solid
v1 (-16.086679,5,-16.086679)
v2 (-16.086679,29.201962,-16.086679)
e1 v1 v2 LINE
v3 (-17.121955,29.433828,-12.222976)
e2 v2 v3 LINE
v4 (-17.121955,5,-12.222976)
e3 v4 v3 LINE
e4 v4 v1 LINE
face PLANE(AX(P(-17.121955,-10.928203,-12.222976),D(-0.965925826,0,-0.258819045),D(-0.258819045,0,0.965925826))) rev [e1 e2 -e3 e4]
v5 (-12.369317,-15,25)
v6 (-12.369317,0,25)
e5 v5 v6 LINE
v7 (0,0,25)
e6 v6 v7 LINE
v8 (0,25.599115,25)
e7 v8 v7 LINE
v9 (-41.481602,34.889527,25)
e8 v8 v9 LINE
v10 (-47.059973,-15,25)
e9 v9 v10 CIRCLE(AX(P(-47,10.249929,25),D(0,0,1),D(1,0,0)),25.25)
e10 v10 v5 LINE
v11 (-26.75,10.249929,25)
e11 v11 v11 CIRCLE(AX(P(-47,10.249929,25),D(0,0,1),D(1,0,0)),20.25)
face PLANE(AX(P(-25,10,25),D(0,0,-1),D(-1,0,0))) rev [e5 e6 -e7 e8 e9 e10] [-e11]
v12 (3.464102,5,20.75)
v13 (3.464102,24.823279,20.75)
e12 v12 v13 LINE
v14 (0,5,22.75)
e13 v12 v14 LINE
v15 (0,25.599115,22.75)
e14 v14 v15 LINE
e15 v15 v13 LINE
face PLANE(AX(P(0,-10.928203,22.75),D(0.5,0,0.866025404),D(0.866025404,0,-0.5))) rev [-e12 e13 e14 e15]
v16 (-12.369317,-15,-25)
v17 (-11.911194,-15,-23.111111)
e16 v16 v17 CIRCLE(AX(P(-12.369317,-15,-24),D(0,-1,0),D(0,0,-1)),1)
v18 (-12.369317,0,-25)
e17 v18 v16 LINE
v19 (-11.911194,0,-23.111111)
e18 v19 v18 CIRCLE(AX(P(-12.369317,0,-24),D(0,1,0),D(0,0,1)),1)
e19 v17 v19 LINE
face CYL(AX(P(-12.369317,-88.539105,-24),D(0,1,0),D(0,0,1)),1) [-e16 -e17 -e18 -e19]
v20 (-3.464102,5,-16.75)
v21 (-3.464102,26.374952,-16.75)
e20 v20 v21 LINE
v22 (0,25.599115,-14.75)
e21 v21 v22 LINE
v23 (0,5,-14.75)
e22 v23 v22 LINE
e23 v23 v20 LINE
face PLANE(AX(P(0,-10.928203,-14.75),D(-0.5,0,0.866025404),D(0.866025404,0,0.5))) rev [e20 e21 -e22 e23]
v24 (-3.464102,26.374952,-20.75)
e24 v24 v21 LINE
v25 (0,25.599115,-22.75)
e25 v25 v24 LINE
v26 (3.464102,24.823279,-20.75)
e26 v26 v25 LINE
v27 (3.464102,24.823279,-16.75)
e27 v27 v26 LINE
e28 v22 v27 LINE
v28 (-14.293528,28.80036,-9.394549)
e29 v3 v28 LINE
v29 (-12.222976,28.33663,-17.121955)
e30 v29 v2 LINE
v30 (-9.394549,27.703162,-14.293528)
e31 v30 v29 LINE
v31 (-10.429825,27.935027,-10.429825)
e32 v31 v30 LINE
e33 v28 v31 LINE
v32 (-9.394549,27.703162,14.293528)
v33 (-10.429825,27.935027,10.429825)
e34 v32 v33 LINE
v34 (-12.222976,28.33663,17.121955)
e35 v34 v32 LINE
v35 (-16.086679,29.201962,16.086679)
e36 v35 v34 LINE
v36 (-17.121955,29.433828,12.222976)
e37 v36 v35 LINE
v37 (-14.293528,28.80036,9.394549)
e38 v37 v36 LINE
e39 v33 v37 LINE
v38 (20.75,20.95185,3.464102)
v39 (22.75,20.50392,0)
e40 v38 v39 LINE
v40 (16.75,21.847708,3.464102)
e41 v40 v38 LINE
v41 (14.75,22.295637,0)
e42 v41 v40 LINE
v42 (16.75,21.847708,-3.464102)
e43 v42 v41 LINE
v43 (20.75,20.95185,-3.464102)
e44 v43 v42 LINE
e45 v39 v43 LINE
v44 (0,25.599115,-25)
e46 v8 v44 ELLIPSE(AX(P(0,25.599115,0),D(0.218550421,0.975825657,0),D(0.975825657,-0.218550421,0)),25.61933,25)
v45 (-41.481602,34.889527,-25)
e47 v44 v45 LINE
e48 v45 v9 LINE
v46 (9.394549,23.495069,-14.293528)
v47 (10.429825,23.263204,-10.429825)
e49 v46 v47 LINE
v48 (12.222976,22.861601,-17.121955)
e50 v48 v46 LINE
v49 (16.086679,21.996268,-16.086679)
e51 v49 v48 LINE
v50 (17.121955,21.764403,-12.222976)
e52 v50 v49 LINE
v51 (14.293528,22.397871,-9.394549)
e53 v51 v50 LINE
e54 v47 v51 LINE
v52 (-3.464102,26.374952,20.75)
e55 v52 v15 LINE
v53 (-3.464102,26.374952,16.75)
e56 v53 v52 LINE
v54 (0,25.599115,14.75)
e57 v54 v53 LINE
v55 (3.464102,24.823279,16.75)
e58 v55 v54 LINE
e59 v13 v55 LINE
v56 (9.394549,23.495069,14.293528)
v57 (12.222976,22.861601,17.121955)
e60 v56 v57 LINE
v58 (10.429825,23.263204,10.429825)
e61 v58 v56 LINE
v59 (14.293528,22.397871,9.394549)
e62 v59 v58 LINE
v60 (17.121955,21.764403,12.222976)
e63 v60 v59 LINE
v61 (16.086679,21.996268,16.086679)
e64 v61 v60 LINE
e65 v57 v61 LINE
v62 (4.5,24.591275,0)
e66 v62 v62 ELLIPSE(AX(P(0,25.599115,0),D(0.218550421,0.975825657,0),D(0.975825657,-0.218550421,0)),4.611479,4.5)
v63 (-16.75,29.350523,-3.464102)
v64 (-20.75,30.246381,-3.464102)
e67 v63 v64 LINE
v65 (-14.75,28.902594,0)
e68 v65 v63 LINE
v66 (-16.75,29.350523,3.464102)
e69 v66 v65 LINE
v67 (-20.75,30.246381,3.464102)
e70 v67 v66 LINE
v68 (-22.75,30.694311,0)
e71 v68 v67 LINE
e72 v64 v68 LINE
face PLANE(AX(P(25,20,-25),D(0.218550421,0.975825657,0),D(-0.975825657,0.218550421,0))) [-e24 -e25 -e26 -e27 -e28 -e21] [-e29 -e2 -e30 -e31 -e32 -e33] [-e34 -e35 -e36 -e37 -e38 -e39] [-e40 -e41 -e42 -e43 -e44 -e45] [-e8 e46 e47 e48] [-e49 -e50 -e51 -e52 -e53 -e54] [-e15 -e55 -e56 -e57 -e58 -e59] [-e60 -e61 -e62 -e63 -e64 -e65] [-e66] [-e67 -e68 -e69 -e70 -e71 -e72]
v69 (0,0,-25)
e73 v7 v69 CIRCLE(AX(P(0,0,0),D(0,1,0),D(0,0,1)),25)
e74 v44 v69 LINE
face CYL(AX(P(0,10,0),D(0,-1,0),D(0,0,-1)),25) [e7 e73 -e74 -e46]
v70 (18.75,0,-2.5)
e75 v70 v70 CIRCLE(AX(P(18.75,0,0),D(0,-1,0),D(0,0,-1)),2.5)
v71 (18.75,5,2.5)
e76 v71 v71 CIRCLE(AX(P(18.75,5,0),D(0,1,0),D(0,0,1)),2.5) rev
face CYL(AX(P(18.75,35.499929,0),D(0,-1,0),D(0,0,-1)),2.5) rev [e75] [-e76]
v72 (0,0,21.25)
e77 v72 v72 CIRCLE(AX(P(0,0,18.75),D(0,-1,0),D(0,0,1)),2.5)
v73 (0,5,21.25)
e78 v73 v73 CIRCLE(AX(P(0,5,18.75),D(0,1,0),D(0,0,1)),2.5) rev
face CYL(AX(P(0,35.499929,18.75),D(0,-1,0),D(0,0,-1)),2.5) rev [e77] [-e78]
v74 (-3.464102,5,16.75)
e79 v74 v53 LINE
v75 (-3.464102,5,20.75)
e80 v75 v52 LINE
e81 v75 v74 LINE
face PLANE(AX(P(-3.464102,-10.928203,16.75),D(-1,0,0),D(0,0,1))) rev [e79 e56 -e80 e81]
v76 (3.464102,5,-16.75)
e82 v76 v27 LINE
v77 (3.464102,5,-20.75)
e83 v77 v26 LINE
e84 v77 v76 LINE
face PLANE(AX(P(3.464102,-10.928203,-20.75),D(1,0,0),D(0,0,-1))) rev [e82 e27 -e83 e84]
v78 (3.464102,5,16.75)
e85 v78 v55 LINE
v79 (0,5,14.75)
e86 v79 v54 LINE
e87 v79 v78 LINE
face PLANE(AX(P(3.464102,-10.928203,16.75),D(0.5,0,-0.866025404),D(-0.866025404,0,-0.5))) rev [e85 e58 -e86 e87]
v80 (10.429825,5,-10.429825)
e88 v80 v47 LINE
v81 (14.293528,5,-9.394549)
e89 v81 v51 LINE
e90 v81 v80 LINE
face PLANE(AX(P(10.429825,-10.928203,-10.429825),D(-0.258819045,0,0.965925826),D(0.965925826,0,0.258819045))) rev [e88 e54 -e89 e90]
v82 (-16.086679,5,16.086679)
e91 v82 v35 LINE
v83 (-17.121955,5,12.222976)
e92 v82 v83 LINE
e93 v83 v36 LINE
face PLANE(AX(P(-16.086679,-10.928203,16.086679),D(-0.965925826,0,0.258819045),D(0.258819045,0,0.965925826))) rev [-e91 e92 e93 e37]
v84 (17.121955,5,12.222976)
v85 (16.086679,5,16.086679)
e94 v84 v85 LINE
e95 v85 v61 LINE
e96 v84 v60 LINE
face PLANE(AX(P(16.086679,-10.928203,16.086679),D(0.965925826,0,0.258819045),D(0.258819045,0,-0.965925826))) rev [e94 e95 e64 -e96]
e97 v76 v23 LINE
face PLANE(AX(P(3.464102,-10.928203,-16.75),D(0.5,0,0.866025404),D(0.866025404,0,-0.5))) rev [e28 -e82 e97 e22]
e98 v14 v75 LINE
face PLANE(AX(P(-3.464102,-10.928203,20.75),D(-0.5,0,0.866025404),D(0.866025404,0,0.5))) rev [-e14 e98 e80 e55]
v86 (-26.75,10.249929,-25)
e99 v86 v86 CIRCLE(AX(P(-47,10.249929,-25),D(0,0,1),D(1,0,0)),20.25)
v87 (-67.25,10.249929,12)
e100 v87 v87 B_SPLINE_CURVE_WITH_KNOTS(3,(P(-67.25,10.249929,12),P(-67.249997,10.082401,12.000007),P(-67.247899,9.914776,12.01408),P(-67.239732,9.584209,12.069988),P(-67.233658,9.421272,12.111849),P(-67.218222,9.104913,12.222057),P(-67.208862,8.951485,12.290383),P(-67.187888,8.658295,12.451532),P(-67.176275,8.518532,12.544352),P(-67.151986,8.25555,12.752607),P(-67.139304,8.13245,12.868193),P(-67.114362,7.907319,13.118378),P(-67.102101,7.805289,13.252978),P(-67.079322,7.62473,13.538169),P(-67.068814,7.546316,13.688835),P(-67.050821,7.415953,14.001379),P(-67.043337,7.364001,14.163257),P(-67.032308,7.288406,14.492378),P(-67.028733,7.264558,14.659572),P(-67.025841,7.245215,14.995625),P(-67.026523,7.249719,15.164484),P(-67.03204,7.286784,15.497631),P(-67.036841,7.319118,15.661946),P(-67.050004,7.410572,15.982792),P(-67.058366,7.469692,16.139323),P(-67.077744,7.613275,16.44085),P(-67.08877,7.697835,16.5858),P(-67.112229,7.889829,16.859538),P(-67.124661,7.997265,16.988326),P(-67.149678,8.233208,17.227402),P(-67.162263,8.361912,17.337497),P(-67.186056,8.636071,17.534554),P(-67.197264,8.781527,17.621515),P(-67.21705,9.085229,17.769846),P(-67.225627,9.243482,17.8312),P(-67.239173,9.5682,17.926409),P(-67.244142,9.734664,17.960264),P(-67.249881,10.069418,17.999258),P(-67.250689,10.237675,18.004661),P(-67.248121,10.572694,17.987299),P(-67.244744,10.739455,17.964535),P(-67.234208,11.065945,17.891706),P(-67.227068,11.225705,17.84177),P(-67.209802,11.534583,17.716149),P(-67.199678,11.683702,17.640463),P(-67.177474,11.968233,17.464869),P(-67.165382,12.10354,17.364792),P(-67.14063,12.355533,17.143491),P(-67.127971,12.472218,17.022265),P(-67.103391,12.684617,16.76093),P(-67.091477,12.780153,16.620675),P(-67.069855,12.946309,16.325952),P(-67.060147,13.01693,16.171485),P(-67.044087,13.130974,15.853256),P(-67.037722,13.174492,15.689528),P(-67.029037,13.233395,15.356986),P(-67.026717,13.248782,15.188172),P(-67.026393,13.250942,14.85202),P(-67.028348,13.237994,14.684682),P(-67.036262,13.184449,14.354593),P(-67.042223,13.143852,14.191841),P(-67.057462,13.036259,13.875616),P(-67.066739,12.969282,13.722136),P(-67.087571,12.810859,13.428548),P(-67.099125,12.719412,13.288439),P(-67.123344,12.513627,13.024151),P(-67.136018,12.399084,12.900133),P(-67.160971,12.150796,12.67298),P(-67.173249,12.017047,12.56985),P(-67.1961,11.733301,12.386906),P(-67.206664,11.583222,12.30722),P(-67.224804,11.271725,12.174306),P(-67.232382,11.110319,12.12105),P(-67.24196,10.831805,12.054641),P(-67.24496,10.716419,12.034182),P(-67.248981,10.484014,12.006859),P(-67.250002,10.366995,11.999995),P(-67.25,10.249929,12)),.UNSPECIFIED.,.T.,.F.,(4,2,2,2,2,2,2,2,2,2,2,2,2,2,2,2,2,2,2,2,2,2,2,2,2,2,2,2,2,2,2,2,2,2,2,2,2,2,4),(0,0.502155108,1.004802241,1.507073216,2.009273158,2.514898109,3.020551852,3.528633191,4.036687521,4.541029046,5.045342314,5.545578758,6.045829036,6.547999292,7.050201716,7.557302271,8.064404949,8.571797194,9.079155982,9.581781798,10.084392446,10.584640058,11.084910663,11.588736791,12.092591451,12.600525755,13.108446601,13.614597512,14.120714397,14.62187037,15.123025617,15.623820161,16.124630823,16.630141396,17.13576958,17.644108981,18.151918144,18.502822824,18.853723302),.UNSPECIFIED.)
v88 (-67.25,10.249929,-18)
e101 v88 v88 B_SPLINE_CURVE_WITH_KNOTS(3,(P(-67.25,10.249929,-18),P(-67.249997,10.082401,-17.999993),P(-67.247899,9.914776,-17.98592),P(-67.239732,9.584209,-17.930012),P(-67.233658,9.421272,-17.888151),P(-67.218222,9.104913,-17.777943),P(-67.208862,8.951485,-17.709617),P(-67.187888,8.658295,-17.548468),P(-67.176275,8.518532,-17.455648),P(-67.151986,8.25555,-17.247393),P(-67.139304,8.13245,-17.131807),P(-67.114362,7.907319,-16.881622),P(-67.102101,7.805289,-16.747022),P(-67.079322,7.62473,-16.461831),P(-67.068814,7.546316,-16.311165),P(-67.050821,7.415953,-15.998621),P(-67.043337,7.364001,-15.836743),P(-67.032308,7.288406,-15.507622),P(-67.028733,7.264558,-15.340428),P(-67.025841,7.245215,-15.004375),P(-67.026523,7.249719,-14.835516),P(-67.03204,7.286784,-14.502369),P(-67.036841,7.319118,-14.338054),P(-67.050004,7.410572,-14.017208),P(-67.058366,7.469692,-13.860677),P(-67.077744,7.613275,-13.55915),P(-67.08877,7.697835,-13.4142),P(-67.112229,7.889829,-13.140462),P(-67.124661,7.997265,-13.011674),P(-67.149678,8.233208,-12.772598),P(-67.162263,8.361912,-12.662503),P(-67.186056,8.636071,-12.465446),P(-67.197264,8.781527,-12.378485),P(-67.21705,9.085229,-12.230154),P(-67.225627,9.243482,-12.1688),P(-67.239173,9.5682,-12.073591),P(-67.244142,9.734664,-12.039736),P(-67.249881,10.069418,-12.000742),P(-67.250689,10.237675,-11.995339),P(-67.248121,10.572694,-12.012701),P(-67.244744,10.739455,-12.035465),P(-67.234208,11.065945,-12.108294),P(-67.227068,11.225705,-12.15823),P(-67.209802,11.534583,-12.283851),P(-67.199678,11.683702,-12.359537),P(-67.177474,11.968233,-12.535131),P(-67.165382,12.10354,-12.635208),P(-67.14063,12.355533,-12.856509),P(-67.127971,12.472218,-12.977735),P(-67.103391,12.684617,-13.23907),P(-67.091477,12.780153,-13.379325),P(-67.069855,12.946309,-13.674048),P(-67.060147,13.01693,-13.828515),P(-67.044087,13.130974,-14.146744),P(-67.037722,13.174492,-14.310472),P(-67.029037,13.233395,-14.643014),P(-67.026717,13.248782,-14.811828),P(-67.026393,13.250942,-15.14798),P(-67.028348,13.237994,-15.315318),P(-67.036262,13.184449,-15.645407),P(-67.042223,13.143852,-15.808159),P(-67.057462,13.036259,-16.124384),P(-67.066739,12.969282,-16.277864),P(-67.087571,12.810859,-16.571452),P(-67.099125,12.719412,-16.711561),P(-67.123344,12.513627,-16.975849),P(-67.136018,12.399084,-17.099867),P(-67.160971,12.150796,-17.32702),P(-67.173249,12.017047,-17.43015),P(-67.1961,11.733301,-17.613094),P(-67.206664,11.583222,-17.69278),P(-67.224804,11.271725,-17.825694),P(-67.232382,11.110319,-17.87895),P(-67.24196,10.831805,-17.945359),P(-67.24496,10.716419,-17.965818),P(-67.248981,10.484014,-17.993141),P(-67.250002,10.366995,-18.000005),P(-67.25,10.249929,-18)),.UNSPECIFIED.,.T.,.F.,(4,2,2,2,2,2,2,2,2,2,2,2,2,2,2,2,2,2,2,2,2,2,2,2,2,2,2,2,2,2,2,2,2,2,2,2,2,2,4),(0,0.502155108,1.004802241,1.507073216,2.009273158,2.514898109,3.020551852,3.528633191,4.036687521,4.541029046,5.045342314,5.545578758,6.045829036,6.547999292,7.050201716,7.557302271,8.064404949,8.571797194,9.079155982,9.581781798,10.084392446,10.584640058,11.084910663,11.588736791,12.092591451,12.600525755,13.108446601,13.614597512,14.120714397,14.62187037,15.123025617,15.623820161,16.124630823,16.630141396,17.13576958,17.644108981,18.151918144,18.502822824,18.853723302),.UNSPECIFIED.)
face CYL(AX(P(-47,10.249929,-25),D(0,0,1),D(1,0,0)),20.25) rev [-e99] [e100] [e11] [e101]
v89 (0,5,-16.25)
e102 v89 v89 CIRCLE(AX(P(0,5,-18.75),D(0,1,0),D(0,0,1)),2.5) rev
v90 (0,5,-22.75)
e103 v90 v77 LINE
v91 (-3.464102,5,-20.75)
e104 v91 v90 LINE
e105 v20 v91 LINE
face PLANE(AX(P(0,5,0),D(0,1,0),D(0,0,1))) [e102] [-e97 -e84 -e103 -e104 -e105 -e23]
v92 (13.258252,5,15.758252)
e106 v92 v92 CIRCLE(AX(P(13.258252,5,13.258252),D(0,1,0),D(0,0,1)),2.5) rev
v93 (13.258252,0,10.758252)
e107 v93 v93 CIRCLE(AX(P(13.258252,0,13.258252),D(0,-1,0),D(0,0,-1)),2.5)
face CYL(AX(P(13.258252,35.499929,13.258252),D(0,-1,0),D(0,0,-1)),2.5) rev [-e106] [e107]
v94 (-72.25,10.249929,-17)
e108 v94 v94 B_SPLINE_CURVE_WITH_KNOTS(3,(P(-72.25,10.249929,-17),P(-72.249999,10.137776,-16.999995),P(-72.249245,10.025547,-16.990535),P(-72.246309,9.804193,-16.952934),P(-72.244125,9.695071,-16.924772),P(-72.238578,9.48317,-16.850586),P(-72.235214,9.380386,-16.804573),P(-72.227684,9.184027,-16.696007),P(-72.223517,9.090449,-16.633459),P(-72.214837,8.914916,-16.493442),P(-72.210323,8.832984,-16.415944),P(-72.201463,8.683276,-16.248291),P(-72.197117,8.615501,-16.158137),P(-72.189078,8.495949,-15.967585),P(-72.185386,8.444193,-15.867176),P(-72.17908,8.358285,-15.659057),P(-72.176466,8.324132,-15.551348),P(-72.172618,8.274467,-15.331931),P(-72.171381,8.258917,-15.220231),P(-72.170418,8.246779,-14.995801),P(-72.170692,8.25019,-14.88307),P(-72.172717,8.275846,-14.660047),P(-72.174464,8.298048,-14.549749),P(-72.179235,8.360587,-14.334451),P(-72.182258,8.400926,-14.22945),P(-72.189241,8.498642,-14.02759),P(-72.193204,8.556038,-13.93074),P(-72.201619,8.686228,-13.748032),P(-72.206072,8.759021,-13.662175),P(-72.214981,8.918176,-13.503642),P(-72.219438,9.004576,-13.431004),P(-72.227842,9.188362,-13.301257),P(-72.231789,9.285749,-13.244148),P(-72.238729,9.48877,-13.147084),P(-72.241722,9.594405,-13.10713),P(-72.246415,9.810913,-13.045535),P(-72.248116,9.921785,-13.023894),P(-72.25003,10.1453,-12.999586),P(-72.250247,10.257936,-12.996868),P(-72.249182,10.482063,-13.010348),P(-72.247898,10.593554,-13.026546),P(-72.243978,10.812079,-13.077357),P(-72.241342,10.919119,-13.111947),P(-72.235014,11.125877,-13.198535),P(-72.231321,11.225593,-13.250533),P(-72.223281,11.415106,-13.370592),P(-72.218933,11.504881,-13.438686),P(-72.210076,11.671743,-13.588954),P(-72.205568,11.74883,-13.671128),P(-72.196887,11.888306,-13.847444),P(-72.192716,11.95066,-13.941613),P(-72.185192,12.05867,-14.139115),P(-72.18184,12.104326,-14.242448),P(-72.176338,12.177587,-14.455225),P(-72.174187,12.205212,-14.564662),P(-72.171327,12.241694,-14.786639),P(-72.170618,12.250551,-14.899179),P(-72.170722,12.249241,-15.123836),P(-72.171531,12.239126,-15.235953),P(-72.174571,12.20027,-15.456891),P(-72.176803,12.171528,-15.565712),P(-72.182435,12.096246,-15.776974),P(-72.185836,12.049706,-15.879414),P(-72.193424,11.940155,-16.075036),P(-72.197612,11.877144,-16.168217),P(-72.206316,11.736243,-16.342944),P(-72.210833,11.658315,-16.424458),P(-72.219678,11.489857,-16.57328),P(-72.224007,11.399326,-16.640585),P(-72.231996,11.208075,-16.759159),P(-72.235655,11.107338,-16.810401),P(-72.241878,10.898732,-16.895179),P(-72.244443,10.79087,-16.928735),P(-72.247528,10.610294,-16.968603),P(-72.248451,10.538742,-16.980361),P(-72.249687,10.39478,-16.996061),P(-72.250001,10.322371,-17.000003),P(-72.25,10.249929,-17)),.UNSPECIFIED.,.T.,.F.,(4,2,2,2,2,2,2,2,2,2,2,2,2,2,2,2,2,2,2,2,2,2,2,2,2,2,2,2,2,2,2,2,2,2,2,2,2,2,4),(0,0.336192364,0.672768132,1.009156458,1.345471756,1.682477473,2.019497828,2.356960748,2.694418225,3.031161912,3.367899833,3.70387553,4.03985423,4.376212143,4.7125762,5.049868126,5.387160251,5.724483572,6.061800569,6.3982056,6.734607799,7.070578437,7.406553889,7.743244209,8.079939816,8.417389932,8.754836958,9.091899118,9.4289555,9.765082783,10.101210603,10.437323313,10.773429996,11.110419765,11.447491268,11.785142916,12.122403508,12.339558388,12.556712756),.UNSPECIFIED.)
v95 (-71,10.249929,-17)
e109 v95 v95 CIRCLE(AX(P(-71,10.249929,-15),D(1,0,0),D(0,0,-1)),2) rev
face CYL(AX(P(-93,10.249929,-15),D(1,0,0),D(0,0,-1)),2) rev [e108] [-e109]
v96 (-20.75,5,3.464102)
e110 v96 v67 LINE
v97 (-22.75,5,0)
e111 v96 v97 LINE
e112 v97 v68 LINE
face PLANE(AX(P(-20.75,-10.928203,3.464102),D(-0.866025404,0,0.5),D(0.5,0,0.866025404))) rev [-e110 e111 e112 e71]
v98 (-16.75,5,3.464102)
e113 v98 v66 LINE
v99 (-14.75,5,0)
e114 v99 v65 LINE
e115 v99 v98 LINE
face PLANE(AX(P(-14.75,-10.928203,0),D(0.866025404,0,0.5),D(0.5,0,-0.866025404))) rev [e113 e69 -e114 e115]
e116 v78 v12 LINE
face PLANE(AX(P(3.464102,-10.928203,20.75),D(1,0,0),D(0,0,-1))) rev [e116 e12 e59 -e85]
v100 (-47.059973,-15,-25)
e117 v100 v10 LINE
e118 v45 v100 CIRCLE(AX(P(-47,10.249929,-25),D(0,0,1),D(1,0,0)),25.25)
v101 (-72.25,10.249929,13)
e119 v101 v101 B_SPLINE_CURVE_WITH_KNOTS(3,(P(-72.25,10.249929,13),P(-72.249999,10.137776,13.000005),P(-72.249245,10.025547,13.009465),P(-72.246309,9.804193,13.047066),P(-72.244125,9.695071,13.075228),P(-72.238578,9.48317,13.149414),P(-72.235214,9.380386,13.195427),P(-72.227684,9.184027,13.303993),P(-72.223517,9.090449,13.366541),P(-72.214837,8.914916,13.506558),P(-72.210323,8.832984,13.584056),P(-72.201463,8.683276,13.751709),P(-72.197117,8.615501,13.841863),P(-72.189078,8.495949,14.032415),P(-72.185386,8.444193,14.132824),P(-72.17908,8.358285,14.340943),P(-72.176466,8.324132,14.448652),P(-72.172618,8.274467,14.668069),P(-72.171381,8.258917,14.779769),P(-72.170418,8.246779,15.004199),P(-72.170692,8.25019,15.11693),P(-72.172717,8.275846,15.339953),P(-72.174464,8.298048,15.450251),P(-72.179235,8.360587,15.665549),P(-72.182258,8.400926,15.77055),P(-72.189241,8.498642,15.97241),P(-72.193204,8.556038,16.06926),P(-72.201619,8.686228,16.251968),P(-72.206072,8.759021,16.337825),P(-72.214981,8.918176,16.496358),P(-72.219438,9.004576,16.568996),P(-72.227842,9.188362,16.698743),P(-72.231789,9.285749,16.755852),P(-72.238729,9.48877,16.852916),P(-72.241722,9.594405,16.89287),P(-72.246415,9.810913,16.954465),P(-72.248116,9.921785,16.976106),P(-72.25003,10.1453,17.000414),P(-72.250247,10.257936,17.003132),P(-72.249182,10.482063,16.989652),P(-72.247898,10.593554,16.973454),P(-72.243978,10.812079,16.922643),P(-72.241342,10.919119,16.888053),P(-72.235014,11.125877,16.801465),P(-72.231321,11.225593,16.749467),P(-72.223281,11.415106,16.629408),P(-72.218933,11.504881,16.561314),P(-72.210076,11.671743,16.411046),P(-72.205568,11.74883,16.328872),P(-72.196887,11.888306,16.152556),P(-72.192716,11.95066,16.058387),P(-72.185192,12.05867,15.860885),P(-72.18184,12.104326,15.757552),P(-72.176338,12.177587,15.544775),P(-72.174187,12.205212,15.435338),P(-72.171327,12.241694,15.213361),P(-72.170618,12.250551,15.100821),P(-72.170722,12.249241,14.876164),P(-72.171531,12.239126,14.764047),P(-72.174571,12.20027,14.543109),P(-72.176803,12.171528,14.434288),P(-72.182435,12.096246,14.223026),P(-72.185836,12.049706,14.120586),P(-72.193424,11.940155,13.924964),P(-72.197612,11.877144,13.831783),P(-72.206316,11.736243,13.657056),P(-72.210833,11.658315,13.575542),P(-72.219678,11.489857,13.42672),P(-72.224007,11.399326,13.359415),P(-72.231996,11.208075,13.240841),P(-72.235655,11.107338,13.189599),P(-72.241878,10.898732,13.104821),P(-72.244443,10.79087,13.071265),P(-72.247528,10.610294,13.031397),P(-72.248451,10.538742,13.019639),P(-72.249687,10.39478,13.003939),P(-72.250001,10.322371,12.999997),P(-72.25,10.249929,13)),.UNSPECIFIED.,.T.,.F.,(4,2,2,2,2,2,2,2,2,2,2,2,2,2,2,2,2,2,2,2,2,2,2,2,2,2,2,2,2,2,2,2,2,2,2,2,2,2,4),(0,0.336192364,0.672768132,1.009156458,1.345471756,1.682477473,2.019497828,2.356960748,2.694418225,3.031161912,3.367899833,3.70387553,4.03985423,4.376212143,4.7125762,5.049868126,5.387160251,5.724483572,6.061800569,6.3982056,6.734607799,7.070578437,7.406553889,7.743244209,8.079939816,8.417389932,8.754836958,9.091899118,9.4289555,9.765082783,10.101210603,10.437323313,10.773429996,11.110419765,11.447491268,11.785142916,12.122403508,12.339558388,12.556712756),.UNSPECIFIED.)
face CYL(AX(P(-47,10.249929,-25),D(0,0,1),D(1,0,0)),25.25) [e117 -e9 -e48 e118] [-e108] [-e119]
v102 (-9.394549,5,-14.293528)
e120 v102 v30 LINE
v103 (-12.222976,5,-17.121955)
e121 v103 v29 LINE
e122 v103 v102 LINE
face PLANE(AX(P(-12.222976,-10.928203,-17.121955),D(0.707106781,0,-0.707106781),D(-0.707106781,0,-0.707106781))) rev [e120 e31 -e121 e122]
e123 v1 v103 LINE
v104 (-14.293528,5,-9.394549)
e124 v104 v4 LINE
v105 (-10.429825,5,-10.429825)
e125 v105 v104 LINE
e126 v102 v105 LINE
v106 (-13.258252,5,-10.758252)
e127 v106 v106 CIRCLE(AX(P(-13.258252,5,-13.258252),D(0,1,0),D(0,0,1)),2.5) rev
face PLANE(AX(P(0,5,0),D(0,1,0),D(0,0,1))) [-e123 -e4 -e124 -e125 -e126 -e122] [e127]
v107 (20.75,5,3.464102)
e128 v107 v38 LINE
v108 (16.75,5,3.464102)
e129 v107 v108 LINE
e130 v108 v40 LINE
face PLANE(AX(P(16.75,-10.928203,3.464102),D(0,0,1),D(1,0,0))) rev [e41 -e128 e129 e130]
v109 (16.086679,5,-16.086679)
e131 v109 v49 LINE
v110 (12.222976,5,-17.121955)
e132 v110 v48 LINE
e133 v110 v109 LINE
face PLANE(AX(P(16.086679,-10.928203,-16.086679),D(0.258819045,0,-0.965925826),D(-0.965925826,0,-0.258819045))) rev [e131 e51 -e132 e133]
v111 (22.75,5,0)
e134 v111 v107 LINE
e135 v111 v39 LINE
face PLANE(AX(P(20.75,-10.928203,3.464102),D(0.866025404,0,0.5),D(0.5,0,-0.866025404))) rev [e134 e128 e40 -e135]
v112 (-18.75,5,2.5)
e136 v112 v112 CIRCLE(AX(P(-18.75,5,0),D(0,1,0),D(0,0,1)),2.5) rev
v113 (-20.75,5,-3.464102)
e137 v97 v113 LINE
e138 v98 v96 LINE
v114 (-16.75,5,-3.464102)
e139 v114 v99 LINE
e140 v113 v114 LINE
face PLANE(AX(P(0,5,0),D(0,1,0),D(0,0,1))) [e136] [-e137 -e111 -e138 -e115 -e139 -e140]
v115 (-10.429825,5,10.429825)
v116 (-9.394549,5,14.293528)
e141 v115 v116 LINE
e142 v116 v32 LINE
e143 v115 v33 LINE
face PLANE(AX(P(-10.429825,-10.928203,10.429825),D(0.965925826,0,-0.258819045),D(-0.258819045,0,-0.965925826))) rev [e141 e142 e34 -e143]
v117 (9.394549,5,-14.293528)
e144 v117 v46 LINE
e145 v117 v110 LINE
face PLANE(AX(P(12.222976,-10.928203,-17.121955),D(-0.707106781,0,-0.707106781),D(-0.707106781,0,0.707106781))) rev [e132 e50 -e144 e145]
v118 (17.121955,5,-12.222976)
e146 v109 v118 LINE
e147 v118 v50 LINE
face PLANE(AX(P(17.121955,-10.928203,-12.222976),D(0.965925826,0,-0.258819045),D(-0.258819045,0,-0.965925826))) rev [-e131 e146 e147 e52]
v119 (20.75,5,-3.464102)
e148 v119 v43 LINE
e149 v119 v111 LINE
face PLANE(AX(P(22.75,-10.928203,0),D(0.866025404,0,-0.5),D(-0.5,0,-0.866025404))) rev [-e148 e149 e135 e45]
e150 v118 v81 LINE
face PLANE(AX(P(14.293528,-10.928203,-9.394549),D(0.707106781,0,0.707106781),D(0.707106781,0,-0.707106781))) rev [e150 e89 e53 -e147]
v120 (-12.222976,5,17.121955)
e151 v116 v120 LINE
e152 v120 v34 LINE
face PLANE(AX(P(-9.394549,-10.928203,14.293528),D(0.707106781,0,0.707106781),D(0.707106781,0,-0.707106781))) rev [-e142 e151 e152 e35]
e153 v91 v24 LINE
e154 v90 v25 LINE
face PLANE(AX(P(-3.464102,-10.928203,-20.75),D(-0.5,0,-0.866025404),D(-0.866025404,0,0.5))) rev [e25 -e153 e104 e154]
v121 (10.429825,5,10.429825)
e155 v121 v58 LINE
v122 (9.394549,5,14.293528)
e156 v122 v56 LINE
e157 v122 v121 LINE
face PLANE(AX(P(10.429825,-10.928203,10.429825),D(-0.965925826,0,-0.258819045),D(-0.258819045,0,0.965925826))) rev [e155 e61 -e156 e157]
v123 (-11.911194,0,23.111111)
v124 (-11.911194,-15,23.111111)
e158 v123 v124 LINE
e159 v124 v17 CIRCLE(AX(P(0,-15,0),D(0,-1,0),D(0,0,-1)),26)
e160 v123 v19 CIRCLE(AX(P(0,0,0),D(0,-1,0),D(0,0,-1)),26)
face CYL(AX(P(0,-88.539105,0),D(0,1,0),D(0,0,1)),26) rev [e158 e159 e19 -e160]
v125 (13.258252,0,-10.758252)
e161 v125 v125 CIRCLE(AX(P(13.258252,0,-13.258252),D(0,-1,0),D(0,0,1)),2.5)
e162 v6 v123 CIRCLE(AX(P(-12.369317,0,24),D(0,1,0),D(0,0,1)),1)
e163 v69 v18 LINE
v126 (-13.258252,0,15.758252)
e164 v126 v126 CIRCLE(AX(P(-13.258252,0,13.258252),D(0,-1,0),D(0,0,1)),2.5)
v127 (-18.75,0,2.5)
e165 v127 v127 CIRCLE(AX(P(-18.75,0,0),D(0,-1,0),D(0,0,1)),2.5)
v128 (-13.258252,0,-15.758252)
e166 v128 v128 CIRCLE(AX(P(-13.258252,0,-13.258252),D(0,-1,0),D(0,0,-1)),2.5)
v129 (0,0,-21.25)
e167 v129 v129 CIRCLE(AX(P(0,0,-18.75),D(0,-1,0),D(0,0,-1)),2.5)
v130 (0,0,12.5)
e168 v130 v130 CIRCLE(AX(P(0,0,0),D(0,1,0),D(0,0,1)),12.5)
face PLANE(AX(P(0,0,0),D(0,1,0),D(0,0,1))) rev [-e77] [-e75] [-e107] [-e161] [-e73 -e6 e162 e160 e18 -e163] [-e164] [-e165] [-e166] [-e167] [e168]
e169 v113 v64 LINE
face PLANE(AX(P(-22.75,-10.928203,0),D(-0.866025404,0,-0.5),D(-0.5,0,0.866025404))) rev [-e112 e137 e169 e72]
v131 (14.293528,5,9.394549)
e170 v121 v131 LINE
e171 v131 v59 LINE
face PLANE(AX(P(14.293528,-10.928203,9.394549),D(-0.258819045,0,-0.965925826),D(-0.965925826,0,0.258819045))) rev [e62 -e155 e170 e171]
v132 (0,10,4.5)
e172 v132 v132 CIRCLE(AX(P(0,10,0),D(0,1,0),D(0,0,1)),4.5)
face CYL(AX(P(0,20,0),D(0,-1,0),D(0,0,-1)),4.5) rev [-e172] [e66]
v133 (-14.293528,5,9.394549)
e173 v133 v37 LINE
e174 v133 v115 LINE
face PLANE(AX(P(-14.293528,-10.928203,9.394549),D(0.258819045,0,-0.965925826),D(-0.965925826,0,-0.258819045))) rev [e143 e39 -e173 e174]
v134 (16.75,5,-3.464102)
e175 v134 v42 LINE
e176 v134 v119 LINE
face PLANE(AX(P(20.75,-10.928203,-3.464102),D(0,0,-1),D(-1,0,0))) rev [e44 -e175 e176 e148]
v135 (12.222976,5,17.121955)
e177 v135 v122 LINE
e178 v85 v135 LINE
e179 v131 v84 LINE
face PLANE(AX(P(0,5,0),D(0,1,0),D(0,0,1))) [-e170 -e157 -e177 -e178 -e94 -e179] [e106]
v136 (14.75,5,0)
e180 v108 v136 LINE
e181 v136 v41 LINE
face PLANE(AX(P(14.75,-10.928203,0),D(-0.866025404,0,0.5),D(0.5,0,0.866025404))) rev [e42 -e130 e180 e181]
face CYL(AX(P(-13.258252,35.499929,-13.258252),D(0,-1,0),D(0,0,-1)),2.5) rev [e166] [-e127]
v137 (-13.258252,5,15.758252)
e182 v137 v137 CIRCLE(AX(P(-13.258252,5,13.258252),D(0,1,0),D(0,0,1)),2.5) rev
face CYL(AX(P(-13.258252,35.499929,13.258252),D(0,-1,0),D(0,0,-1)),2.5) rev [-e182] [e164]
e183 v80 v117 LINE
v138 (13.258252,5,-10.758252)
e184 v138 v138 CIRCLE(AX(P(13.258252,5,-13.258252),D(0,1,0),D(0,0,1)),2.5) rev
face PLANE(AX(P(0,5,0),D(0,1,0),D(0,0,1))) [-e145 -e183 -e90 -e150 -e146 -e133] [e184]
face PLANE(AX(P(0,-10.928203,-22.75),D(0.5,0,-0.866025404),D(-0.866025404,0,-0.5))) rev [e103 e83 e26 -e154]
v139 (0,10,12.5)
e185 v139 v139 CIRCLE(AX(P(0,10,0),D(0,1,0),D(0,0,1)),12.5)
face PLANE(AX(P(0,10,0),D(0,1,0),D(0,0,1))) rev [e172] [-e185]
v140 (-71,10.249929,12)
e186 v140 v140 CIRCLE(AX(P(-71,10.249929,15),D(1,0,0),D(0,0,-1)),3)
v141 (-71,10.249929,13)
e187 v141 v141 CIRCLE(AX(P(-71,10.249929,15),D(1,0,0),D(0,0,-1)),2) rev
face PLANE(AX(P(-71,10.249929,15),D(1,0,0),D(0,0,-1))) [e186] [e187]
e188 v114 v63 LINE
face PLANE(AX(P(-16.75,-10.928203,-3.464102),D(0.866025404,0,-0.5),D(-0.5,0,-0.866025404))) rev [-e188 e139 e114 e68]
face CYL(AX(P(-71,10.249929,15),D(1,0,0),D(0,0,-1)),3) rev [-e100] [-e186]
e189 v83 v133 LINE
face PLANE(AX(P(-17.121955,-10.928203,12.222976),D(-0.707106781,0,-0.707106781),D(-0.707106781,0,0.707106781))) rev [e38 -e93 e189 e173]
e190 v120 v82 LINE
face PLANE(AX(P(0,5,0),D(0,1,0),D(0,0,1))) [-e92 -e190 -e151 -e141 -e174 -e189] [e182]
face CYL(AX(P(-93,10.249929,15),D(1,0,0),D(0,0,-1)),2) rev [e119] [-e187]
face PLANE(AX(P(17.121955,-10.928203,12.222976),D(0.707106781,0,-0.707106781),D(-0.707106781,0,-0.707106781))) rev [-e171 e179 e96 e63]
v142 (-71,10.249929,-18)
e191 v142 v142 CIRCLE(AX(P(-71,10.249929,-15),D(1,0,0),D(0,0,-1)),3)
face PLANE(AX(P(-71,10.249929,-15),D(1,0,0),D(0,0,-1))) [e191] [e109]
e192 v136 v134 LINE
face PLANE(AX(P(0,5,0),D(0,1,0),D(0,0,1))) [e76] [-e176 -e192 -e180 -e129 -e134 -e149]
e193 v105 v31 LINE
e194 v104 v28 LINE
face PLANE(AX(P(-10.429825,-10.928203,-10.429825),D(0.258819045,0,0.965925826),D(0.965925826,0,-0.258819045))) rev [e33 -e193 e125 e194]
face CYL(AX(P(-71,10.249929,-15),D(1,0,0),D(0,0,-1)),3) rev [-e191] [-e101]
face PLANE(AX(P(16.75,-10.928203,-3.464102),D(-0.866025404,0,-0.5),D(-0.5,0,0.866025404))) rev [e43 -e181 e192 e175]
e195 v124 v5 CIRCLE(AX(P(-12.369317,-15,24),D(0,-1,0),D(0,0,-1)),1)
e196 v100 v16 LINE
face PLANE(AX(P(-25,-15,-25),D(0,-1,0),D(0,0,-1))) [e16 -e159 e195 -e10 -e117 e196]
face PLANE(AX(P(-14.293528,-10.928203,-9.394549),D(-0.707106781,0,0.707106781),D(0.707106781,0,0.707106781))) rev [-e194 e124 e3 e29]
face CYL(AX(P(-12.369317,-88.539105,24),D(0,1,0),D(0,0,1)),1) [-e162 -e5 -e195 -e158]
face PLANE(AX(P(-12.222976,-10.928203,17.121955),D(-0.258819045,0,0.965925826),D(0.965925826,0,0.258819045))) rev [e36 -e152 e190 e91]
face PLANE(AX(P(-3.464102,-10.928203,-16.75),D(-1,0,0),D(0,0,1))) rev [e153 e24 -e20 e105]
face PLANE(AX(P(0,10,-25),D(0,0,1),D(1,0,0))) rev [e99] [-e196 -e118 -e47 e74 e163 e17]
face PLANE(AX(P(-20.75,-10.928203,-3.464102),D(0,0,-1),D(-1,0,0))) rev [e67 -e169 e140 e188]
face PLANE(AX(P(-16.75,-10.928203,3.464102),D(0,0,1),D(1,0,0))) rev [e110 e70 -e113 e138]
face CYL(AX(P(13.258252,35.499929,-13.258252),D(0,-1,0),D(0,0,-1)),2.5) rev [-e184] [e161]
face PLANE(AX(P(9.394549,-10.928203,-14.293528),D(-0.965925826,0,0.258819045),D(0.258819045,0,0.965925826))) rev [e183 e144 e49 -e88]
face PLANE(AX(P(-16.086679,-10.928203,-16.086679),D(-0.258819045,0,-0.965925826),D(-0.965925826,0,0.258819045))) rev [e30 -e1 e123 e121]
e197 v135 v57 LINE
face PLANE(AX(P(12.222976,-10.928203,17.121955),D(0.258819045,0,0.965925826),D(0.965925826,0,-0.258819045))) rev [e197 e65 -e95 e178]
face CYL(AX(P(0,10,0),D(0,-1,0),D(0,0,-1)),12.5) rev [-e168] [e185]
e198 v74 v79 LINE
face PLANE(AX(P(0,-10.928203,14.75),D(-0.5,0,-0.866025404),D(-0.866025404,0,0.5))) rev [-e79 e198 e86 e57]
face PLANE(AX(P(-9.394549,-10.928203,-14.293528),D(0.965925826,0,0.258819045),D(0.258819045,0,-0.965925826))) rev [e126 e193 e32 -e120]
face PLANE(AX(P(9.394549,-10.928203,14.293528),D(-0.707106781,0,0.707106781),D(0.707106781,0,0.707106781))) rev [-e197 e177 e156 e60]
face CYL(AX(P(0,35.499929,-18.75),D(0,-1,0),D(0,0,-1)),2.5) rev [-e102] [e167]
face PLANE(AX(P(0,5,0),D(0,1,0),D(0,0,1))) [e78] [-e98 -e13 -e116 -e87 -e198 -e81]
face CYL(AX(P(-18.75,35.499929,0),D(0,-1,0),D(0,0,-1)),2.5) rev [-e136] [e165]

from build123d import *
from build123d.topology import SkipClean

# Parameters (mm, degrees)
SKETCH_1_R                      = 12.5
EXTRUDE_1_DEPTH                 = 10
SKETCH_2_R                      = 4.5
EXTRUDE_2_DEPTH                 = 10
EXTRUDE_4_DEPTH                 = 25
EXTRUDE_4_DEPTH_BACK            = 25
SKETCH_13_R                     = 20.25
SKETCH_8_R                      = 2.5
SKETCH_8_R_2                    = 4.5
CUT_EXTRUDE_2_DEPTH             = 85.292985729
CUT_EXTRUDE_6_DEPTH             = 13.5
CUT_EXTRUDE_6_DIRECTION_2_REACH = 85.47
CUT_EXTRUDE_8_DEPTH             = 85.292985729
SKETCH_16_R                     = 2
CUT_EXTRUDE_9_DEPTH             = 43
SKETCH_17_R                     = 3
CUT_EXTRUDE_10_DEPTH            = 4
SKETCH_18_R                     = 26
CUT_EXTRUDE_11_DEPTH            = 15
EXTRUDE_5_DEPTH                 = 15
FILLET_1_R                      = 1


with BuildPart() as part:
    # 草图1 → 凸台-拉伸1 (new body)
    with BuildSketch(Plane(origin=(0, 0, 0), x_dir=(1, 0, 0), z_dir=(0, 1, 0))):
        with BuildLine():
            Line((0, 25), (-25, 25))
            Line((-25, 25), (-25, 0))
            Line((-25, 0), (-25, -25))
            Line((-25, -25), (0, -25))
            ThreePointArc((0, -25), (25, 0), (0, 25))
        make_face()
        with Locations(Location((0, 0, 0), (0, 0, 270))):
            Circle(SKETCH_1_R, mode=Mode.SUBTRACT)
    extrude(amount=EXTRUDE_1_DEPTH)

    # 草图2 → 凸台-拉伸2 (add)
    with BuildSketch(Plane(origin=(0, 10, 0), x_dir=(1, 0, 0), z_dir=(0, 1, 0))):
        with BuildLine():
            Line((0, 25), (-25, 25))
            Line((-25, 25), (-25, 0))
            Line((-25, 0), (-25, -25))
            Line((-25, -25), (0, -25))
            ThreePointArc((0, -25), (25, 0), (0, 25))
        make_face()
        with Locations(Location((0, 0, 0), (0, 0, 270))):
            Circle(SKETCH_2_R, mode=Mode.SUBTRACT)
    extrude(amount=EXTRUDE_2_DEPTH)

    # 草图13 → 凸台-拉伸4 (add, two sides: drawn at the far end of the back side and taken through both)
    with BuildSketch(Plane.XY.offset(-EXTRUDE_4_DEPTH_BACK)):
        with BuildLine():
            Line((-25, 20), (25, 20))
            Line((25, 20), (-41.48160186, 34.889526622))
            ThreePointArc((-41.48160186, 34.889526622), (-56.232086603, 33.751653755), (-67.813248889, 24.545773302))
            ThreePointArc((-67.813248889, 24.545773302), (-69.358217625, -1.483468201), (-47.059973081, -15))
            Line((-47.059973081, -15), (-25, -15))
            Line((-25, -15), (-25, 0))
            Line((-25, 0), (-25, 20))
        make_face()
        with Locations((-47, 10.249928777)):
            Circle(SKETCH_13_R, mode=Mode.SUBTRACT)
    extrude(amount=EXTRUDE_4_DEPTH + EXTRUDE_4_DEPTH_BACK)

    # 草图8 → 切除-拉伸2 (cut, through all)
    with BuildSketch(Plane.XZ):
        with Locations(Location((18.75, 0, 0), (0, 0, 270))):
            Circle(SKETCH_8_R)
        with Locations(Location((13.258252147, 13.258252147, 0), (0, 0, 270))):
            Circle(SKETCH_8_R)
        with Locations((0, 18.75)):
            Circle(SKETCH_8_R)
        with Locations((-18.75, 0)):
            Circle(SKETCH_8_R)
        with Locations((-13.258252147, 13.258252147)):
            Circle(SKETCH_8_R)
        with Locations((13.258252147, -13.258252147)):
            Circle(SKETCH_8_R)
        with Locations(Location((0, -18.75, 0), (0, 0, 270))):
            Circle(SKETCH_8_R)
        with Locations(Location((-13.258252147, -13.258252147, 0), (0, 0, 270))):
            Circle(SKETCH_8_R)
        Circle(SKETCH_8_R_2)
    extrude(amount=-CUT_EXTRUDE_2_DEPTH, mode=Mode.SUBTRACT)

    # 草图11 → 切除-拉伸6 (cut)
    with BuildSketch(Plane(origin=(0, 18.5, 0), x_dir=(1, 0, 0), z_dir=(0, 1, 0))):
        Polygon((0, -14.75), (-3.464101615, -16.75), (-3.464101615, -20.75), (0, -22.75), (3.464101615, -20.75), (3.464101615, -16.75), align=None)
        Polygon((-14.293528328, -9.394548842), (-10.429825023, -10.429825023), (-9.394548842, -14.293528328), (-12.222975967, -17.121955452), (-16.086679272, -16.086679272), (-17.121955452, -12.222975967), align=None)
        Polygon((10.429825023, -10.429825023), (9.394548842, -14.293528328), (12.222975967, -17.121955452), (16.086679272, -16.086679272), (17.121955452, -12.222975967), (14.293528328, -9.394548842), align=None)
        Polygon((-9.394548842, 14.293528328), (-10.429825023, 10.429825023), (-14.293528328, 9.394548842), (-17.121955452, 12.222975967), (-16.086679272, 16.086679272), (-12.222975967, 17.121955452), align=None)
        Polygon((-16.75, 3.464101615), (-14.75, 0), (-16.75, -3.464101615), (-20.75, -3.464101615), (-22.75, 0), (-20.75, 3.464101615), align=None)
        Polygon((10.429825023, 10.429825023), (14.293528328, 9.394548842), (17.121955452, 12.222975967), (16.086679272, 16.086679272), (12.222975967, 17.121955452), (9.394548842, 14.293528328), align=None)
        Polygon((14.75, 0), (16.75, -3.464101615), (20.75, -3.464101615), (22.75, 0), (20.75, 3.464101615), (16.75, 3.464101615), align=None)
        Polygon((3.464101615, 16.75), (0, 14.75), (-3.464101615, 16.75), (-3.464101615, 20.75), (0, 22.75), (3.464101615, 20.75), align=None)
    extrude(amount=-CUT_EXTRUDE_6_DEPTH, mode=Mode.SUBTRACT)

    # 切除-拉伸6 direction 2: up to this plane
    cut_extrude_6_direction_2_end = Plane(origin=(25, 20, -25), z_dir=(0.21855042139595313, 0.9758256572296362, 0))
    # 草图11 → 切除-拉伸6 direction 2 (cut, up to the surface)
    with BuildSketch(Plane(origin=(0, 18.5, 0), x_dir=(1, 0, 0), z_dir=(0, 1, 0)), mode=Mode.PRIVATE) as cut_extrude_6_direction_2_sk1:
        Polygon((0, -14.75), (-3.464101615, -16.75), (-3.464101615, -20.75), (0, -22.75), (3.464101615, -20.75), (3.464101615, -16.75), align=None)
    cut_extrude_6_direction_2_tool1 = split(extrude(cut_extrude_6_direction_2_sk1.sketch, amount=CUT_EXTRUDE_6_DIRECTION_2_REACH, mode=Mode.PRIVATE), bisect_by=cut_extrude_6_direction_2_end, keep=Keep.BOTH, mode=Mode.PRIVATE)
    add(cut_extrude_6_direction_2_tool1.solids().sort_by_distance((0, 18.5, 18.75))[0], mode=Mode.SUBTRACT)
    # 草图11 → 切除-拉伸6 direction 2 (cut, up to the surface)
    with BuildSketch(Plane(origin=(0, 18.5, 0), x_dir=(1, 0, 0), z_dir=(0, 1, 0)), mode=Mode.PRIVATE) as cut_extrude_6_direction_2_sk2:
        Polygon((-14.293528328, -9.394548842), (-10.429825023, -10.429825023), (-9.394548842, -14.293528328), (-12.222975967, -17.121955452), (-16.086679272, -16.086679272), (-17.121955452, -12.222975967), align=None)
    cut_extrude_6_direction_2_tool2 = split(extrude(cut_extrude_6_direction_2_sk2.sketch, amount=CUT_EXTRUDE_6_DIRECTION_2_REACH, mode=Mode.PRIVATE), bisect_by=cut_extrude_6_direction_2_end, keep=Keep.BOTH, mode=Mode.PRIVATE)
    add(cut_extrude_6_direction_2_tool2.solids().sort_by_distance((-13.258252, 18.5, 13.258252))[0], mode=Mode.SUBTRACT)
    # 草图11 → 切除-拉伸6 direction 2 (cut, up to the surface)
    with BuildSketch(Plane(origin=(0, 18.5, 0), x_dir=(1, 0, 0), z_dir=(0, 1, 0)), mode=Mode.PRIVATE) as cut_extrude_6_direction_2_sk3:
        Polygon((10.429825023, -10.429825023), (9.394548842, -14.293528328), (12.222975967, -17.121955452), (16.086679272, -16.086679272), (17.121955452, -12.222975967), (14.293528328, -9.394548842), align=None)
    cut_extrude_6_direction_2_tool3 = split(extrude(cut_extrude_6_direction_2_sk3.sketch, amount=CUT_EXTRUDE_6_DIRECTION_2_REACH, mode=Mode.PRIVATE), bisect_by=cut_extrude_6_direction_2_end, keep=Keep.BOTH, mode=Mode.PRIVATE)
    add(cut_extrude_6_direction_2_tool3.solids().sort_by_distance((13.258252, 18.5, 13.258252))[0], mode=Mode.SUBTRACT)
    # 草图11 → 切除-拉伸6 direction 2 (cut, up to the surface)
    with BuildSketch(Plane(origin=(0, 18.5, 0), x_dir=(1, 0, 0), z_dir=(0, 1, 0)), mode=Mode.PRIVATE) as cut_extrude_6_direction_2_sk4:
        Polygon((-9.394548842, 14.293528328), (-10.429825023, 10.429825023), (-14.293528328, 9.394548842), (-17.121955452, 12.222975967), (-16.086679272, 16.086679272), (-12.222975967, 17.121955452), align=None)
    cut_extrude_6_direction_2_tool4 = split(extrude(cut_extrude_6_direction_2_sk4.sketch, amount=CUT_EXTRUDE_6_DIRECTION_2_REACH, mode=Mode.PRIVATE), bisect_by=cut_extrude_6_direction_2_end, keep=Keep.BOTH, mode=Mode.PRIVATE)
    add(cut_extrude_6_direction_2_tool4.solids().sort_by_distance((-13.258252, 18.5, -13.258252))[0], mode=Mode.SUBTRACT)
    # 草图11 → 切除-拉伸6 direction 2 (cut, up to the surface)
    with BuildSketch(Plane(origin=(0, 18.5, 0), x_dir=(1, 0, 0), z_dir=(0, 1, 0)), mode=Mode.PRIVATE) as cut_extrude_6_direction_2_sk5:
        Polygon((-16.75, 3.464101615), (-14.75, 0), (-16.75, -3.464101615), (-20.75, -3.464101615), (-22.75, 0), (-20.75, 3.464101615), align=None)
    cut_extrude_6_direction_2_tool5 = split(extrude(cut_extrude_6_direction_2_sk5.sketch, amount=CUT_EXTRUDE_6_DIRECTION_2_REACH, mode=Mode.PRIVATE), bisect_by=cut_extrude_6_direction_2_end, keep=Keep.BOTH, mode=Mode.PRIVATE)
    add(cut_extrude_6_direction_2_tool5.solids().sort_by_distance((-18.75, 18.5, 0))[0], mode=Mode.SUBTRACT)
    # 草图11 → 切除-拉伸6 direction 2 (cut, up to the surface)
    with BuildSketch(Plane(origin=(0, 18.5, 0), x_dir=(1, 0, 0), z_dir=(0, 1, 0)), mode=Mode.PRIVATE) as cut_extrude_6_direction_2_sk6:
        Polygon((10.429825023, 10.429825023), (14.293528328, 9.394548842), (17.121955452, 12.222975967), (16.086679272, 16.086679272), (12.222975967, 17.121955452), (9.394548842, 14.293528328), align=None)
    cut_extrude_6_direction_2_tool6 = split(extrude(cut_extrude_6_direction_2_sk6.sketch, amount=CUT_EXTRUDE_6_DIRECTION_2_REACH, mode=Mode.PRIVATE), bisect_by=cut_extrude_6_direction_2_end, keep=Keep.BOTH, mode=Mode.PRIVATE)
    add(cut_extrude_6_direction_2_tool6.solids().sort_by_distance((13.258252, 18.5, -13.258252))[0], mode=Mode.SUBTRACT)
    # 草图11 → 切除-拉伸6 direction 2 (cut, up to the surface)
    with BuildSketch(Plane(origin=(0, 18.5, 0), x_dir=(1, 0, 0), z_dir=(0, 1, 0)), mode=Mode.PRIVATE) as cut_extrude_6_direction_2_sk7:
        Polygon((14.75, 0), (16.75, -3.464101615), (20.75, -3.464101615), (22.75, 0), (20.75, 3.464101615), (16.75, 3.464101615), align=None)
    cut_extrude_6_direction_2_tool7 = split(extrude(cut_extrude_6_direction_2_sk7.sketch, amount=CUT_EXTRUDE_6_DIRECTION_2_REACH, mode=Mode.PRIVATE), bisect_by=cut_extrude_6_direction_2_end, keep=Keep.BOTH, mode=Mode.PRIVATE)
    add(cut_extrude_6_direction_2_tool7.solids().sort_by_distance((18.75, 18.5, 0))[0], mode=Mode.SUBTRACT)
    # 草图11 → 切除-拉伸6 direction 2 (cut, up to the surface)
    with BuildSketch(Plane(origin=(0, 18.5, 0), x_dir=(1, 0, 0), z_dir=(0, 1, 0)), mode=Mode.PRIVATE) as cut_extrude_6_direction_2_sk8:
        Polygon((3.464101615, 16.75), (0, 14.75), (-3.464101615, 16.75), (-3.464101615, 20.75), (0, 22.75), (3.464101615, 20.75), align=None)
    cut_extrude_6_direction_2_tool8 = split(extrude(cut_extrude_6_direction_2_sk8.sketch, amount=CUT_EXTRUDE_6_DIRECTION_2_REACH, mode=Mode.PRIVATE), bisect_by=cut_extrude_6_direction_2_end, keep=Keep.BOTH, mode=Mode.PRIVATE)
    add(cut_extrude_6_direction_2_tool8.solids().sort_by_distance((0, 18.5, -18.75))[0], mode=Mode.SUBTRACT)

    # 草图14 → 切除-拉伸8 (cut, through all)
    with BuildSketch(Plane.XZ):
        with BuildLine():
            Line((25, 25), (0, 25))
            ThreePointArc((0, 25), (17.67766953, 17.67766953), (25, 0))
            Line((25, 0), (25, 25))
        make_face()
        with BuildLine():
            Line((25, -25), (25, 0))
            ThreePointArc((25, 0), (17.67766953, -17.67766953), (0, -25))
            Line((0, -25), (25, -25))
        make_face()
    extrude(amount=-CUT_EXTRUDE_8_DEPTH, mode=Mode.SUBTRACT)

    # 草图16 → 切除-拉伸9 (cut)
    with BuildSketch(Plane(origin=(-50, 0, 0), x_dir=(0, 0, -1), z_dir=(1, 0, 0))):
        with Locations((-15, 10.249928777)):
            Circle(SKETCH_16_R)
        with Locations((15, 10.249928777)):
            Circle(SKETCH_16_R)
    extrude(amount=-CUT_EXTRUDE_9_DEPTH, mode=Mode.SUBTRACT)

    # 草图17 → 切除-拉伸10 (cut)
    with BuildSketch(Plane(origin=(-67, 0, 0), x_dir=(0, 0, -1), z_dir=(1, 0, 0))):
        with Locations((-15, 10.249928777)):
            Circle(SKETCH_17_R)
        with Locations((15, 10.249928777)):
            Circle(SKETCH_17_R)
    extrude(amount=-CUT_EXTRUDE_10_DEPTH, mode=Mode.SUBTRACT)

    # 草图18 → 切除-拉伸11 (cut)
    with BuildSketch(Plane.XZ):
        Circle(SKETCH_18_R)
    extrude(amount=CUT_EXTRUDE_11_DEPTH, mode=Mode.SUBTRACT)

    # 草图19 → 凸台-拉伸5 (add)
    with SkipClean():  # the faces are left unmerged after this step: merging them gives an invalid solid
        with BuildSketch(Plane.XZ):
            with BuildLine():
                Line((-7.141428429, 25), (-25, 25))
                Line((-25, 25), (-25, 7.141428429))
                ThreePointArc((-25, 7.141428429), (-18.384776311, 18.384776311), (-7.141428429, 25))
            make_face()
            with BuildLine():
                Line((-25, -7.141428429), (-25, -25))
                Line((-25, -25), (-7.141428429, -25))
                ThreePointArc((-7.141428429, -25), (-18.384776311, -18.384776311), (-25, -7.141428429))
            make_face()
        extrude(amount=EXTRUDE_5_DEPTH)

    # 圆角1
    # the kernel refuses this fillet: 1 mm, written as the material it takes off along each edge
    with BuildSketch(Plane(origin=(-7.141428429, 0, 25), x_dir=(-0.929749456499876, 0, -0.36819281380573593), z_dir=(0, -1, 0))) as fillet_1_piece_1:
        with BuildLine():
            CenterArc((5.228819257, -0.995121502), FILLET_1_R, 95.661837923, 152.733955549)
            Line((4.860626443, -1.924870958), (0, 0))
            ThreePointArc((0, 0), (2.565081145, -0.12684096), (5.13016229, 0))
        make_face()
    extrude(amount=28.069721121, mode=Mode.SUBTRACT)
    with BuildSketch(Plane(origin=(-7.141428429, 0, -25), x_dir=(-1, 0, 0), z_dir=(0, -1, 0))) as fillet_1_piece_2:
        with BuildLine():
            CenterArc((5.227888448, -1), FILLET_1_R, 90, 152.733955549)
            ThreePointArc((4.769765601, -1.888888889), (2.43158473, -0.826514131), (0, 0))
            Line((0, 0), (5.227888448, 0))
        make_face()
    extrude(amount=28.069721121, mode=Mode.SUBTRACT)


solid = part.part
